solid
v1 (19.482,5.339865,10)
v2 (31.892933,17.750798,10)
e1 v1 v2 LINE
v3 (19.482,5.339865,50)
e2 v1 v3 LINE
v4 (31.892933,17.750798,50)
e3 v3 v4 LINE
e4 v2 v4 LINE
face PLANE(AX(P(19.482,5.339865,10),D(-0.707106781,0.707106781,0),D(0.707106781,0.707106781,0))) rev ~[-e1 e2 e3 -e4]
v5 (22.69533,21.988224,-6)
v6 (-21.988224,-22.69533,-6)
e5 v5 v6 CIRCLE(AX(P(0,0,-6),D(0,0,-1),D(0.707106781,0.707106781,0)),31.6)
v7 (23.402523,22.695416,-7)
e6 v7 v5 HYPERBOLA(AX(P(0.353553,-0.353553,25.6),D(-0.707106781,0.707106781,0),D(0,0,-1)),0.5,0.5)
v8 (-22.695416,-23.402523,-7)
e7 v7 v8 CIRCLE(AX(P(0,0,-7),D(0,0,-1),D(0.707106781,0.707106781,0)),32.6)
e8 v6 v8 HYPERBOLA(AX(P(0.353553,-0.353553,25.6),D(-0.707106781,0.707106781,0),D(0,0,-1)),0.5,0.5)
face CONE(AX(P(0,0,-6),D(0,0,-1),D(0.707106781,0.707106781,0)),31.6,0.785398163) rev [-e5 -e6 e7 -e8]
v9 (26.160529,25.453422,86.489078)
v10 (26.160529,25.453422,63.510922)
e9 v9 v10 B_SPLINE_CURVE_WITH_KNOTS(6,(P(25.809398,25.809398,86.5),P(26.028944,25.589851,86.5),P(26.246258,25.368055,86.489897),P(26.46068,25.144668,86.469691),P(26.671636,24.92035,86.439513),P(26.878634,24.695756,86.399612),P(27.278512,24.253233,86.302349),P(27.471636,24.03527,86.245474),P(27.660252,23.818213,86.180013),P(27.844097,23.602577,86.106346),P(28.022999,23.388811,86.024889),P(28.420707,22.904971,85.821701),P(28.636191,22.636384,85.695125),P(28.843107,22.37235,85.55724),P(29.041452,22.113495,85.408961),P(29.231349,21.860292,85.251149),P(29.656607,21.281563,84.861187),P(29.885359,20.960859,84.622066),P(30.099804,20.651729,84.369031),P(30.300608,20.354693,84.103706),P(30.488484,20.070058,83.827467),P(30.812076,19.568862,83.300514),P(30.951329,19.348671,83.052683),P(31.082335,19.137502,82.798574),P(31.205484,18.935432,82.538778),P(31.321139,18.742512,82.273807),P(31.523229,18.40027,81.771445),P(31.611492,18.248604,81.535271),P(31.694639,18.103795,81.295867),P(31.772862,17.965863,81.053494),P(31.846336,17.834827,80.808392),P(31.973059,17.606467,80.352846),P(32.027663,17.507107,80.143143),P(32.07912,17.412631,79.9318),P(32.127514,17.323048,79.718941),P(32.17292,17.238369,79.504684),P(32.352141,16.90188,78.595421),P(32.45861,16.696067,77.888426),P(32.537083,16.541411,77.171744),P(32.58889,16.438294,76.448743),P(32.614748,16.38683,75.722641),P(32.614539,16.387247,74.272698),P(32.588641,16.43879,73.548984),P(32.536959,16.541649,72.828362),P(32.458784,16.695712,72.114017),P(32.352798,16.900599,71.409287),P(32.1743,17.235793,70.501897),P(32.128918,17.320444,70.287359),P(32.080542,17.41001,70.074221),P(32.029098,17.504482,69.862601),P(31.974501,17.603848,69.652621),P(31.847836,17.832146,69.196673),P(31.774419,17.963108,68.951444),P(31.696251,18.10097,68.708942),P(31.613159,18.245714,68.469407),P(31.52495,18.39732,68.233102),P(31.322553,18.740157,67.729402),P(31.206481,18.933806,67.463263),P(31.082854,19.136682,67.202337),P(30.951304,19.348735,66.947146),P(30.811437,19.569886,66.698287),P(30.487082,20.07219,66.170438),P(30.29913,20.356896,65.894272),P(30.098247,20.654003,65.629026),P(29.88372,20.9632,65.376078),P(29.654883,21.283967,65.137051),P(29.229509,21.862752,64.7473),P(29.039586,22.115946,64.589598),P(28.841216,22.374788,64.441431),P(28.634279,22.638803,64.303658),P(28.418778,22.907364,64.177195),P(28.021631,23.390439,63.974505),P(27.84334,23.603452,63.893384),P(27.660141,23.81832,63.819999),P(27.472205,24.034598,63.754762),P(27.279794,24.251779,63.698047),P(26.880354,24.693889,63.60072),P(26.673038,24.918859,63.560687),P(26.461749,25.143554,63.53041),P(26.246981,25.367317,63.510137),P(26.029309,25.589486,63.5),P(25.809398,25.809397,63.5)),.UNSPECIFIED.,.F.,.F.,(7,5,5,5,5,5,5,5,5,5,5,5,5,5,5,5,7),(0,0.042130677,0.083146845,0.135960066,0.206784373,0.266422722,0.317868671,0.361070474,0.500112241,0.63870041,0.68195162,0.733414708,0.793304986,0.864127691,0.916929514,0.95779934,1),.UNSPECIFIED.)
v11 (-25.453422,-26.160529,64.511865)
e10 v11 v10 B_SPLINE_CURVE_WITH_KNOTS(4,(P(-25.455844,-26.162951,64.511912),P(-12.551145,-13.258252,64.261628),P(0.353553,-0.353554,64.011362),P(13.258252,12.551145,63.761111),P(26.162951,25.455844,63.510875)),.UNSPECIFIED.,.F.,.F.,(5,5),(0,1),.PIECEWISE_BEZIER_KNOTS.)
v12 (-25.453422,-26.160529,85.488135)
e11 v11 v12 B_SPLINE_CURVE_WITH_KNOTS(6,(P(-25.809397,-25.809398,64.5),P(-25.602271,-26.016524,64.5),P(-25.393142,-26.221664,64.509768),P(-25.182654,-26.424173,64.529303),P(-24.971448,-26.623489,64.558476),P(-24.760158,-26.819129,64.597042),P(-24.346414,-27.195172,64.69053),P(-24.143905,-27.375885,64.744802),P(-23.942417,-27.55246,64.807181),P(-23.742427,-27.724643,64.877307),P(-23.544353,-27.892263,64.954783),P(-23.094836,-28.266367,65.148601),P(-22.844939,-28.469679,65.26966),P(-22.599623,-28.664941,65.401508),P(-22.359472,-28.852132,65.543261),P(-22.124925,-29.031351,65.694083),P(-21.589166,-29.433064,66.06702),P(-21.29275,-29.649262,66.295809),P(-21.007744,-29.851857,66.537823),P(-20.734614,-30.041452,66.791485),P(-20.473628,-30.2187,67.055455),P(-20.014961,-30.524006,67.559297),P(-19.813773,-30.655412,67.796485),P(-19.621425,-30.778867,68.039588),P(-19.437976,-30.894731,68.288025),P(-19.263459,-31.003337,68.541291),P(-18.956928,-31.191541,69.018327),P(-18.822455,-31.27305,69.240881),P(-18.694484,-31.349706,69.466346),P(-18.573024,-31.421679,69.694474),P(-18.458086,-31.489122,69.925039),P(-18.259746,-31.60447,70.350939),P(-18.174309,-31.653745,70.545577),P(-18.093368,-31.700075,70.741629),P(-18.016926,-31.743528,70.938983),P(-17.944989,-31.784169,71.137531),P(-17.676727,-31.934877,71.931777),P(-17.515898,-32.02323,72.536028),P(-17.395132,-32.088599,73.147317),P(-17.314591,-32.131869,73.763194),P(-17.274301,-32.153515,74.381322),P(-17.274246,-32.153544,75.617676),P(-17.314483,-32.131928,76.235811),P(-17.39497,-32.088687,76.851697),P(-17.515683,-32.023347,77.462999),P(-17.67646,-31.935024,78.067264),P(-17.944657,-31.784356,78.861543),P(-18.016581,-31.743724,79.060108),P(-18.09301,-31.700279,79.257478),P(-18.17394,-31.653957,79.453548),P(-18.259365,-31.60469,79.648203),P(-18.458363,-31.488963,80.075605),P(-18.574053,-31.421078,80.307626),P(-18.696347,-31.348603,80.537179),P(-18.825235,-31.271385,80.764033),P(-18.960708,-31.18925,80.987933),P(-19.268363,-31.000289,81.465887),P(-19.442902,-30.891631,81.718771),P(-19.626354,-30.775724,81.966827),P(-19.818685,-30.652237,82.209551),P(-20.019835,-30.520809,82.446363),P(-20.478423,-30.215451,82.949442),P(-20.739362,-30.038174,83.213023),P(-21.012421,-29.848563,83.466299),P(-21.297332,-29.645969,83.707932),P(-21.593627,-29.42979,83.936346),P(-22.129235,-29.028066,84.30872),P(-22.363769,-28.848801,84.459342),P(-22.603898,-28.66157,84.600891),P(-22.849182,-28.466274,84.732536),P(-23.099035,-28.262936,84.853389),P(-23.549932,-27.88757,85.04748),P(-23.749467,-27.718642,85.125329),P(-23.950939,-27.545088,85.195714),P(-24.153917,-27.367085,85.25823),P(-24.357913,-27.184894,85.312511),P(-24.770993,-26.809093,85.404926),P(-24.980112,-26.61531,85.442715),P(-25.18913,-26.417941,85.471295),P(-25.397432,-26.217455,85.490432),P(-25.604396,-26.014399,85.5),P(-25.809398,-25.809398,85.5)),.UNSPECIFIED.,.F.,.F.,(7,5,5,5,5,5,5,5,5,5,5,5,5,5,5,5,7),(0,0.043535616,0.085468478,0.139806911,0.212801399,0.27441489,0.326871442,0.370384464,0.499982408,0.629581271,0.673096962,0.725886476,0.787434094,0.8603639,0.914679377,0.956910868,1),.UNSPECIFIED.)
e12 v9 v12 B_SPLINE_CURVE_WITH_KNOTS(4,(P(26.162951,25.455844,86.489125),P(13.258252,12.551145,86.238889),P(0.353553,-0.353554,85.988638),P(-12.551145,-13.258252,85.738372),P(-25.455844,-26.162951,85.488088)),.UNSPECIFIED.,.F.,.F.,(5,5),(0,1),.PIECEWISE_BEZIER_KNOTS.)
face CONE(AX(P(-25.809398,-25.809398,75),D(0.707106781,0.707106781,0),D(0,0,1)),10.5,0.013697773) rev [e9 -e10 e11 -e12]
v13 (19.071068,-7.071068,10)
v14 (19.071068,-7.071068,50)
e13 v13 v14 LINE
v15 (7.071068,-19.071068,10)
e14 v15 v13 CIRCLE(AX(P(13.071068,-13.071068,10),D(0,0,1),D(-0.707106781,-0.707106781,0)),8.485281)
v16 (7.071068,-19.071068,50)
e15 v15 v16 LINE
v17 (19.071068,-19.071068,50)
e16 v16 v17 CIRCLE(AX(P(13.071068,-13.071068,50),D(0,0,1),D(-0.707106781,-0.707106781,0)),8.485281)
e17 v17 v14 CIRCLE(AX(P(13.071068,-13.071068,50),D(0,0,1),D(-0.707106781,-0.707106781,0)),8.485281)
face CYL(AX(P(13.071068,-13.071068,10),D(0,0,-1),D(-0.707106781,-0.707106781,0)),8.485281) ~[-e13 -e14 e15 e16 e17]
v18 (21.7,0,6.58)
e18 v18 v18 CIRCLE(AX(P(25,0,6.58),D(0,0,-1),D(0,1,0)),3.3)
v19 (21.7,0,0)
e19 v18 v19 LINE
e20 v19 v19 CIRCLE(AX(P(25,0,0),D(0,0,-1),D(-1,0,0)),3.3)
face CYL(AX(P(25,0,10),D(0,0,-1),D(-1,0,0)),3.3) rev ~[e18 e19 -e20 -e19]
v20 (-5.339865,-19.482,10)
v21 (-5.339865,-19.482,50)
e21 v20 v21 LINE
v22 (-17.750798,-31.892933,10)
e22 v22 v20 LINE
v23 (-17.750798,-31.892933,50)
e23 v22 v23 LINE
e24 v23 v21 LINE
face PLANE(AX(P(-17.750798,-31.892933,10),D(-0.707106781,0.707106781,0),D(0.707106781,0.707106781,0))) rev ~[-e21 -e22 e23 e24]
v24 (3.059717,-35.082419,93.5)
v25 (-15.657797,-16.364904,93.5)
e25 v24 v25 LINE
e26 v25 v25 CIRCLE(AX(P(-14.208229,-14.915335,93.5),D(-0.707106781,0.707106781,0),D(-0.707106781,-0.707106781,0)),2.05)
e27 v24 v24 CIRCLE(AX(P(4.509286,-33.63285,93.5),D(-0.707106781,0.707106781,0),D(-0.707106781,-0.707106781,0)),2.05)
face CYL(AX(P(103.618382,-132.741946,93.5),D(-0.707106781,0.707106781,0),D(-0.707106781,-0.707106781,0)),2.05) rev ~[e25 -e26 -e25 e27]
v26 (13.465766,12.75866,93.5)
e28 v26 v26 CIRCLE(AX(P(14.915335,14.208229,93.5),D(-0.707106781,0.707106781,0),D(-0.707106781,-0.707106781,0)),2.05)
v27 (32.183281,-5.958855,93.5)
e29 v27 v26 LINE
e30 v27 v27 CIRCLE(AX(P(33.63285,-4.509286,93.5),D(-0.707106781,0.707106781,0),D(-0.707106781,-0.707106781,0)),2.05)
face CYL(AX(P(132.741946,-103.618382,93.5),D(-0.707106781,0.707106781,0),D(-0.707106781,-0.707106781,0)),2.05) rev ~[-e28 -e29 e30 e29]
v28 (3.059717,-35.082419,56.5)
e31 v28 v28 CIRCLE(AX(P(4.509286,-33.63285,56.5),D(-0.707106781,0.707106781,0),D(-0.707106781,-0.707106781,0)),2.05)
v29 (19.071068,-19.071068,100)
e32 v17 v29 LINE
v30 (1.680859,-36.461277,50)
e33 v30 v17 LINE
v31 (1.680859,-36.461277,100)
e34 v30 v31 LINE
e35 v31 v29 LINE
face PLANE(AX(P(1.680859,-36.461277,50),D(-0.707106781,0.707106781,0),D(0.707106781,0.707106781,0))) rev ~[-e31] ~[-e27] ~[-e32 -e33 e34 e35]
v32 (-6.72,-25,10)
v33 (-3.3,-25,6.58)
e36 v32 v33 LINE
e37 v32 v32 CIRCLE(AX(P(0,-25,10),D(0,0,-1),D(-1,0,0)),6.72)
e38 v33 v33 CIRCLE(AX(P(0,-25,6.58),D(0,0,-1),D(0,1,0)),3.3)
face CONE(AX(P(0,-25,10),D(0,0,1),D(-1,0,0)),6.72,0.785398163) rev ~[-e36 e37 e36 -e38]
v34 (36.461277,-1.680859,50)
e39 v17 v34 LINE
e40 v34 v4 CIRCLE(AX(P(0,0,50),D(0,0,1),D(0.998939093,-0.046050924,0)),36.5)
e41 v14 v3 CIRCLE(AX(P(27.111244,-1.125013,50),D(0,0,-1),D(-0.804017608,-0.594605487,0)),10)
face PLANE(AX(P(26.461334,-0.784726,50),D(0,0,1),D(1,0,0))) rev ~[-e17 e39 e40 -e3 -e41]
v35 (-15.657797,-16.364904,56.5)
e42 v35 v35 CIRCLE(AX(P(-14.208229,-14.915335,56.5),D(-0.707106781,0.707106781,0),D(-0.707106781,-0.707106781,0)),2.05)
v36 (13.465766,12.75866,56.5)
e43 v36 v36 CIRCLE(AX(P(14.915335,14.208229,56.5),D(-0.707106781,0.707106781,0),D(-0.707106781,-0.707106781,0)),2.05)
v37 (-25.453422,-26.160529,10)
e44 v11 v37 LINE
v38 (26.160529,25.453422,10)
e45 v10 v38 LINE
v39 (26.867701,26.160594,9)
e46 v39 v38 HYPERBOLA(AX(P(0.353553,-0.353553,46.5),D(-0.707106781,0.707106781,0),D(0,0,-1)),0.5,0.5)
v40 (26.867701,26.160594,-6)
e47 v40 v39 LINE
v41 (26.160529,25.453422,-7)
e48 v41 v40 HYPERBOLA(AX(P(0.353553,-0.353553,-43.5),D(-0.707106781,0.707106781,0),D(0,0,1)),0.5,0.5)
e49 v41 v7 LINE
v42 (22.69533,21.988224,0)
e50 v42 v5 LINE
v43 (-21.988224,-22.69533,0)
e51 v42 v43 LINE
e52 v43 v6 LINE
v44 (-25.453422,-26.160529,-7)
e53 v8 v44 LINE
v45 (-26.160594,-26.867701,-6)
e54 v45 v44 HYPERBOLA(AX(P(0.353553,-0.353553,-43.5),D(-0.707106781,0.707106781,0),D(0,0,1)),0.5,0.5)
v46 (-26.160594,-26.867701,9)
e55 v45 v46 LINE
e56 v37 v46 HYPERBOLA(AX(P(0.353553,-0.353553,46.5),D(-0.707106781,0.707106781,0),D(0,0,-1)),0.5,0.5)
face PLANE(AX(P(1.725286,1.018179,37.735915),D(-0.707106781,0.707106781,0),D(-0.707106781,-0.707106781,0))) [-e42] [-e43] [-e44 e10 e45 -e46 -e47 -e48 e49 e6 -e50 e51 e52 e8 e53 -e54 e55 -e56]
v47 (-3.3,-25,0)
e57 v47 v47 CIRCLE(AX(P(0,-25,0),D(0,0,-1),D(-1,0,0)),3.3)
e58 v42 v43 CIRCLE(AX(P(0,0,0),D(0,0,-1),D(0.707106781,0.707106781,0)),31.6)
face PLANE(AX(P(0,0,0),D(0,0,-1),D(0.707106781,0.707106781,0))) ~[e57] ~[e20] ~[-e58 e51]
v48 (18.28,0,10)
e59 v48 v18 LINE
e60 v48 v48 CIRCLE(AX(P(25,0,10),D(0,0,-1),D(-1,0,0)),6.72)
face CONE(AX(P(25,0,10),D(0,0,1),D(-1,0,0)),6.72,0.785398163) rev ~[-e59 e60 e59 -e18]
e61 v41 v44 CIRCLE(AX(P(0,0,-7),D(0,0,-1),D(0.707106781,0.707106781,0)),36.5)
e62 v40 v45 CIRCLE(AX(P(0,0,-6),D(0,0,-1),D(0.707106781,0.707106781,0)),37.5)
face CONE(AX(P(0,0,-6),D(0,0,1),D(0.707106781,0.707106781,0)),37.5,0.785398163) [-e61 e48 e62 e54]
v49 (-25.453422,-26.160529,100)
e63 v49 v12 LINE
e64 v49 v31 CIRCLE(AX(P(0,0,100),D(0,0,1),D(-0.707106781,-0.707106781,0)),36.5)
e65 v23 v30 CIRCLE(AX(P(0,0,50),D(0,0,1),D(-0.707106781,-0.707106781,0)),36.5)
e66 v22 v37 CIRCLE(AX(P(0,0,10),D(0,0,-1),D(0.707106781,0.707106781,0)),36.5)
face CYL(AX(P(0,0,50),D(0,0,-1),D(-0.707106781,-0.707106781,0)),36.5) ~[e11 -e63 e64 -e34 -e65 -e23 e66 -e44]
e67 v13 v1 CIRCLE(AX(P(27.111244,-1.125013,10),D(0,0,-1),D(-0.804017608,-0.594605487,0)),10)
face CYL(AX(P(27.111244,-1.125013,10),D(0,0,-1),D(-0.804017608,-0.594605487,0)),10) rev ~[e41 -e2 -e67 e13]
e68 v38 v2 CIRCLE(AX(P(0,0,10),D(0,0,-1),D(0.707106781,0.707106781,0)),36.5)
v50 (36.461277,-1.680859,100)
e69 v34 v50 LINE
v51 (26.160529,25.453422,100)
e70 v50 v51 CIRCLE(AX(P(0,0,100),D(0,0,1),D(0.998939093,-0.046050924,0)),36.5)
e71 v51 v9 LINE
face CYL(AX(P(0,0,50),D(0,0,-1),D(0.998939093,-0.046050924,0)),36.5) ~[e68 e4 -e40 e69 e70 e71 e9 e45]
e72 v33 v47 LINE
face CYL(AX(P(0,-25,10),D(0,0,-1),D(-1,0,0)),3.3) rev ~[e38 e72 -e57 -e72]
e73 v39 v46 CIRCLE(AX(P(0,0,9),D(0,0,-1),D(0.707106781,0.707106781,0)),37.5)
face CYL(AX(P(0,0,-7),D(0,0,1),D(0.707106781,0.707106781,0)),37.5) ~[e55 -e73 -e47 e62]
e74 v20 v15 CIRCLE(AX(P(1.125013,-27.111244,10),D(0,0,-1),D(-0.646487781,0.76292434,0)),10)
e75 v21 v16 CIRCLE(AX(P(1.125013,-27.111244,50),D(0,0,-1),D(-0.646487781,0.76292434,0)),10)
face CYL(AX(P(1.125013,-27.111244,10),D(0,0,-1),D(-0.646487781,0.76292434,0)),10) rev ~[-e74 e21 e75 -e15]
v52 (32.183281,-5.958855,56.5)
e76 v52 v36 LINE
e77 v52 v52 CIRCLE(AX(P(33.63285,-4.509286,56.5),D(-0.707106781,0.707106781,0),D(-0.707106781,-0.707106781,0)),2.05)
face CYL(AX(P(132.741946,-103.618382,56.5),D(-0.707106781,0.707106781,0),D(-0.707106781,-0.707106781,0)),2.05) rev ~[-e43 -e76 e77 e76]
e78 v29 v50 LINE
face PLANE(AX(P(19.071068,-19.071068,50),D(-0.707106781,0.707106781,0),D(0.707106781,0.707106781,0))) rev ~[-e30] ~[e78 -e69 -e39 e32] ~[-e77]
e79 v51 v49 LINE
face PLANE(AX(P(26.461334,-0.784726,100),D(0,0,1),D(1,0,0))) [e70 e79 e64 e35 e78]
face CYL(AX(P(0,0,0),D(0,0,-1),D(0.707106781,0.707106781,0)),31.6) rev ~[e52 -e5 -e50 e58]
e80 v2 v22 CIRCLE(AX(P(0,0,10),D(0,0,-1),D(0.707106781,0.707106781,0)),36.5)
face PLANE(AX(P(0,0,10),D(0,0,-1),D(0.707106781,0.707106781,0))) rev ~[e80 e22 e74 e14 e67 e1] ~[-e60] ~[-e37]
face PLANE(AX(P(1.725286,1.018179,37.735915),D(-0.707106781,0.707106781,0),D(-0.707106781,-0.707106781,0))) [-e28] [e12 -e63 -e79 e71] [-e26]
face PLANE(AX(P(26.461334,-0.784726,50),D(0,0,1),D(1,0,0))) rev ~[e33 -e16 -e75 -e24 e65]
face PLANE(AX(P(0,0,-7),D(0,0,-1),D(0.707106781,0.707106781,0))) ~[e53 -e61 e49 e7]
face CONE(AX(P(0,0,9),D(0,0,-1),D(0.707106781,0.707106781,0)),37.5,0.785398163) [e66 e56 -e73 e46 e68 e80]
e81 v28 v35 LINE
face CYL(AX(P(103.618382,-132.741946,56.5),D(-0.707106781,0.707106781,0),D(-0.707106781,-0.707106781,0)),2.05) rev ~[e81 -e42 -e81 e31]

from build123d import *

# Parameters (mm, degrees)
F1_ANGLE_BACK  = 45
F1_ANGLE       = 180
F2_SIZE        = 1
F4_D           = 6.6
F4_CSINK_D     = 13.44
F4_CSINK_ANGLE = 90
F6_DEPTH       = 40
F8_DEPTH       = 50
F12_D          = 4.1
F13_W          = 100.6186008453
F13_H          = 151.657152921
F14_DEPTH      = 0.5


# Not quite as in the source:
# - a feature names something its author has since deleted; it is built from what else it names


with BuildPart() as f1:
    # F0 (on Front) → F1 (revolve)
    with BuildSketch(Plane.XZ, mode=Mode.PRIVATE) as f1_sk:
        Polygon((0, 10), (0, 0), (31.6, 0), (31.6, -7), (37.5, -7), (37.5, 10), align=None)
    revolve(f1_sk.sketch.rotate(Axis((0, 0, 5), (0, 0, -1)), -F1_ANGLE_BACK), axis=Axis((0, 0, 5), (0, 0, -1)), revolution_arc=F1_ANGLE)

    # F2
    f2_edges = [f1.edges().sort_by_distance(p)[0] for p in [
        (22.344574, -22.344574, -7),
        (26.516504, -26.516504, -7),
        (26.516504, -26.516504, 10),
    ]]
    chamfer(f2_edges, length=F2_SIZE)

    # F4 (through all)
    with Locations(Plane.XY.offset(10)):
        with Locations((25, 0), (0, -25)):
            CounterSinkHole(F4_D / 2, F4_CSINK_D / 2, counter_sink_angle=F4_CSINK_ANGLE)

    # F5 (on face) → F6 (join)
    with BuildSketch(Plane.XY.offset(10)):
        with BuildLine():
            Line((19.4820004924, 5.3398648686), (7.0710678119, -7.0710678119))
            Line((7.0710678119, -7.0710678119), (-5.3398648686, -19.4820004924))
            ThreePointArc((-5.3398648686, -19.4820004924), (0.79408889, -17.1167209324), (7.0710678119, -19.0710678119))
            ThreePointArc((7.0710678119, -19.0710678119), (19.0710678119, -19.0710678119), (19.0710678119, -7.0710678119))
            ThreePointArc((19.0710678119, -7.0710678119), (17.1167209324, -0.79408889), (19.4820004924, 5.3398648686))
        make_face()
        with BuildLine():
            Line((7.0710678119, -7.0710678119), (0, 0))
            Line((0, 0), (-25.8093975133, -25.8093975133))
            ThreePointArc((-25.8093975133, -25.8093975133), (-21.9914756212, -29.1311688746), (-17.7507975491, -31.8929331729))
            Line((-17.7507975491, -31.8929331729), (-5.3398648686, -19.4820004924))
            Line((-5.3398648686, -19.4820004924), (7.0710678119, -7.0710678119))
        make_face()
        with BuildLine():
            Line((25.8093975133, 25.8093975133), (0, 0))
            Line((0, 0), (7.0710678119, -7.0710678119))
            Line((7.0710678119, -7.0710678119), (19.4820004924, 5.3398648686))
            Line((19.4820004924, 5.3398648686), (31.8929331729, 17.7507975491))
            ThreePointArc((31.8929331729, 17.7507975491), (29.1311688746, 21.9914756212), (25.8093975133, 25.8093975133))
        make_face()
    extrude(amount=F6_DEPTH)

    # F7 (on face) → F8 (join)
    with BuildSketch(Plane.XY.offset(50)):
        with BuildLine():
            ThreePointArc((36.4612769111, -1.6808587126), (35.531279534, 8.3533331479), (31.8929331729, 17.7507975491))
            Line((31.8929331729, 17.7507975491), (19.4820004924, 5.3398648686))
            ThreePointArc((19.4820004924, 5.3398648686), (17.1167209324, -0.79408889), (19.0710678119, -7.0710678119))
            ThreePointArc((19.0710678119, -7.0710678119), (21.5563491861, -13.0710678119), (19.0710678119, -19.0710678119))
            Line((19.0710678119, -19.0710678119), (36.4612769111, -1.6808587126))
        make_face()
        with BuildLine():
            Line((-5.3398648686, -19.4820004924), (-17.7507975491, -31.8929331729))
            ThreePointArc((-17.7507975491, -31.8929331729), (-8.3533331479, -35.531279534), (1.6808587126, -36.4612769111))
            Line((1.6808587126, -36.4612769111), (19.0710678119, -19.0710678119))
            ThreePointArc((19.0710678119, -19.0710678119), (13.0710678119, -21.5563491861), (7.0710678119, -19.0710678119))
            ThreePointArc((7.0710678119, -19.0710678119), (0.79408889, -17.1167209324), (-5.3398648686, -19.4820004924))
        make_face()
        with BuildLine():
            ThreePointArc((31.8929331729, 17.7507975491), (29.1311688746, 21.9914756212), (25.8093975133, 25.8093975133))
            Line((25.8093975133, 25.8093975133), (-25.8093975133, -25.8093975133))
            ThreePointArc((-25.8093975133, -25.8093975133), (-21.9914756212, -29.1311688746), (-17.7507975491, -31.8929331729))
            Line((-17.7507975491, -31.8929331729), (-5.3398648686, -19.4820004924))
            ThreePointArc((-5.3398648686, -19.4820004924), (0.79408889, -17.1167209324), (7.0710678119, -19.0710678119))
            ThreePointArc((7.0710678119, -19.0710678119), (13.0710678119, -21.5563491861), (19.0710678119, -19.0710678119))
            ThreePointArc((19.0710678119, -19.0710678119), (21.5563491861, -13.0710678119), (19.0710678119, -7.0710678119))
            ThreePointArc((19.0710678119, -7.0710678119), (17.1167209324, -0.79408889), (19.4820004924, 5.3398648686))
            Line((19.4820004924, 5.3398648686), (31.8929331729, 17.7507975491))
        make_face()
    extrude(amount=F8_DEPTH)

    # F9 (on face) → F10 (revolve, cut)
    with BuildSketch(Plane(origin=(0, 0, 0), x_dir=(-0.7071067812, -0.7071067812, 0), z_dir=(-0.7071067812, 0.7071067812, 0))):
        Polygon((36.5, 85.5), (-36.5, 86.5), (-36.5, 75), (36.5, 75), align=None)
    revolve(axis=Axis((0, 0, 75), (-0.7071067812, -0.7071067812, 0)), mode=Mode.SUBTRACT)

    # F12 (through all)
    with Locations(Plane(origin=(19.0710678119, -19.0710678119, 0), x_dir=(0.7071067812, 0.7071067812, 0), z_dir=(0.7071067812, -0.7071067812, 0))):
        with Locations((20.5934695606, 93.5), (20.5934695606, 56.5), (-20.5934695606, 56.5), (-20.5934695606, 93.5)):
            Hole(F12_D / 2)

    # F13 (on face) → F14 (cut)
    with BuildSketch(Plane(origin=(0, 0, 0), x_dir=(-0.7071067812, -0.7071067812, 0), z_dir=(-0.7071067812, 0.7071067812, 0))):
        with Locations((-1.9399225712, 37.7359148115)):
            Rectangle(F13_W, F13_H)
    extrude(amount=-F14_DEPTH, mode=Mode.SUBTRACT)


solid = f1.part
